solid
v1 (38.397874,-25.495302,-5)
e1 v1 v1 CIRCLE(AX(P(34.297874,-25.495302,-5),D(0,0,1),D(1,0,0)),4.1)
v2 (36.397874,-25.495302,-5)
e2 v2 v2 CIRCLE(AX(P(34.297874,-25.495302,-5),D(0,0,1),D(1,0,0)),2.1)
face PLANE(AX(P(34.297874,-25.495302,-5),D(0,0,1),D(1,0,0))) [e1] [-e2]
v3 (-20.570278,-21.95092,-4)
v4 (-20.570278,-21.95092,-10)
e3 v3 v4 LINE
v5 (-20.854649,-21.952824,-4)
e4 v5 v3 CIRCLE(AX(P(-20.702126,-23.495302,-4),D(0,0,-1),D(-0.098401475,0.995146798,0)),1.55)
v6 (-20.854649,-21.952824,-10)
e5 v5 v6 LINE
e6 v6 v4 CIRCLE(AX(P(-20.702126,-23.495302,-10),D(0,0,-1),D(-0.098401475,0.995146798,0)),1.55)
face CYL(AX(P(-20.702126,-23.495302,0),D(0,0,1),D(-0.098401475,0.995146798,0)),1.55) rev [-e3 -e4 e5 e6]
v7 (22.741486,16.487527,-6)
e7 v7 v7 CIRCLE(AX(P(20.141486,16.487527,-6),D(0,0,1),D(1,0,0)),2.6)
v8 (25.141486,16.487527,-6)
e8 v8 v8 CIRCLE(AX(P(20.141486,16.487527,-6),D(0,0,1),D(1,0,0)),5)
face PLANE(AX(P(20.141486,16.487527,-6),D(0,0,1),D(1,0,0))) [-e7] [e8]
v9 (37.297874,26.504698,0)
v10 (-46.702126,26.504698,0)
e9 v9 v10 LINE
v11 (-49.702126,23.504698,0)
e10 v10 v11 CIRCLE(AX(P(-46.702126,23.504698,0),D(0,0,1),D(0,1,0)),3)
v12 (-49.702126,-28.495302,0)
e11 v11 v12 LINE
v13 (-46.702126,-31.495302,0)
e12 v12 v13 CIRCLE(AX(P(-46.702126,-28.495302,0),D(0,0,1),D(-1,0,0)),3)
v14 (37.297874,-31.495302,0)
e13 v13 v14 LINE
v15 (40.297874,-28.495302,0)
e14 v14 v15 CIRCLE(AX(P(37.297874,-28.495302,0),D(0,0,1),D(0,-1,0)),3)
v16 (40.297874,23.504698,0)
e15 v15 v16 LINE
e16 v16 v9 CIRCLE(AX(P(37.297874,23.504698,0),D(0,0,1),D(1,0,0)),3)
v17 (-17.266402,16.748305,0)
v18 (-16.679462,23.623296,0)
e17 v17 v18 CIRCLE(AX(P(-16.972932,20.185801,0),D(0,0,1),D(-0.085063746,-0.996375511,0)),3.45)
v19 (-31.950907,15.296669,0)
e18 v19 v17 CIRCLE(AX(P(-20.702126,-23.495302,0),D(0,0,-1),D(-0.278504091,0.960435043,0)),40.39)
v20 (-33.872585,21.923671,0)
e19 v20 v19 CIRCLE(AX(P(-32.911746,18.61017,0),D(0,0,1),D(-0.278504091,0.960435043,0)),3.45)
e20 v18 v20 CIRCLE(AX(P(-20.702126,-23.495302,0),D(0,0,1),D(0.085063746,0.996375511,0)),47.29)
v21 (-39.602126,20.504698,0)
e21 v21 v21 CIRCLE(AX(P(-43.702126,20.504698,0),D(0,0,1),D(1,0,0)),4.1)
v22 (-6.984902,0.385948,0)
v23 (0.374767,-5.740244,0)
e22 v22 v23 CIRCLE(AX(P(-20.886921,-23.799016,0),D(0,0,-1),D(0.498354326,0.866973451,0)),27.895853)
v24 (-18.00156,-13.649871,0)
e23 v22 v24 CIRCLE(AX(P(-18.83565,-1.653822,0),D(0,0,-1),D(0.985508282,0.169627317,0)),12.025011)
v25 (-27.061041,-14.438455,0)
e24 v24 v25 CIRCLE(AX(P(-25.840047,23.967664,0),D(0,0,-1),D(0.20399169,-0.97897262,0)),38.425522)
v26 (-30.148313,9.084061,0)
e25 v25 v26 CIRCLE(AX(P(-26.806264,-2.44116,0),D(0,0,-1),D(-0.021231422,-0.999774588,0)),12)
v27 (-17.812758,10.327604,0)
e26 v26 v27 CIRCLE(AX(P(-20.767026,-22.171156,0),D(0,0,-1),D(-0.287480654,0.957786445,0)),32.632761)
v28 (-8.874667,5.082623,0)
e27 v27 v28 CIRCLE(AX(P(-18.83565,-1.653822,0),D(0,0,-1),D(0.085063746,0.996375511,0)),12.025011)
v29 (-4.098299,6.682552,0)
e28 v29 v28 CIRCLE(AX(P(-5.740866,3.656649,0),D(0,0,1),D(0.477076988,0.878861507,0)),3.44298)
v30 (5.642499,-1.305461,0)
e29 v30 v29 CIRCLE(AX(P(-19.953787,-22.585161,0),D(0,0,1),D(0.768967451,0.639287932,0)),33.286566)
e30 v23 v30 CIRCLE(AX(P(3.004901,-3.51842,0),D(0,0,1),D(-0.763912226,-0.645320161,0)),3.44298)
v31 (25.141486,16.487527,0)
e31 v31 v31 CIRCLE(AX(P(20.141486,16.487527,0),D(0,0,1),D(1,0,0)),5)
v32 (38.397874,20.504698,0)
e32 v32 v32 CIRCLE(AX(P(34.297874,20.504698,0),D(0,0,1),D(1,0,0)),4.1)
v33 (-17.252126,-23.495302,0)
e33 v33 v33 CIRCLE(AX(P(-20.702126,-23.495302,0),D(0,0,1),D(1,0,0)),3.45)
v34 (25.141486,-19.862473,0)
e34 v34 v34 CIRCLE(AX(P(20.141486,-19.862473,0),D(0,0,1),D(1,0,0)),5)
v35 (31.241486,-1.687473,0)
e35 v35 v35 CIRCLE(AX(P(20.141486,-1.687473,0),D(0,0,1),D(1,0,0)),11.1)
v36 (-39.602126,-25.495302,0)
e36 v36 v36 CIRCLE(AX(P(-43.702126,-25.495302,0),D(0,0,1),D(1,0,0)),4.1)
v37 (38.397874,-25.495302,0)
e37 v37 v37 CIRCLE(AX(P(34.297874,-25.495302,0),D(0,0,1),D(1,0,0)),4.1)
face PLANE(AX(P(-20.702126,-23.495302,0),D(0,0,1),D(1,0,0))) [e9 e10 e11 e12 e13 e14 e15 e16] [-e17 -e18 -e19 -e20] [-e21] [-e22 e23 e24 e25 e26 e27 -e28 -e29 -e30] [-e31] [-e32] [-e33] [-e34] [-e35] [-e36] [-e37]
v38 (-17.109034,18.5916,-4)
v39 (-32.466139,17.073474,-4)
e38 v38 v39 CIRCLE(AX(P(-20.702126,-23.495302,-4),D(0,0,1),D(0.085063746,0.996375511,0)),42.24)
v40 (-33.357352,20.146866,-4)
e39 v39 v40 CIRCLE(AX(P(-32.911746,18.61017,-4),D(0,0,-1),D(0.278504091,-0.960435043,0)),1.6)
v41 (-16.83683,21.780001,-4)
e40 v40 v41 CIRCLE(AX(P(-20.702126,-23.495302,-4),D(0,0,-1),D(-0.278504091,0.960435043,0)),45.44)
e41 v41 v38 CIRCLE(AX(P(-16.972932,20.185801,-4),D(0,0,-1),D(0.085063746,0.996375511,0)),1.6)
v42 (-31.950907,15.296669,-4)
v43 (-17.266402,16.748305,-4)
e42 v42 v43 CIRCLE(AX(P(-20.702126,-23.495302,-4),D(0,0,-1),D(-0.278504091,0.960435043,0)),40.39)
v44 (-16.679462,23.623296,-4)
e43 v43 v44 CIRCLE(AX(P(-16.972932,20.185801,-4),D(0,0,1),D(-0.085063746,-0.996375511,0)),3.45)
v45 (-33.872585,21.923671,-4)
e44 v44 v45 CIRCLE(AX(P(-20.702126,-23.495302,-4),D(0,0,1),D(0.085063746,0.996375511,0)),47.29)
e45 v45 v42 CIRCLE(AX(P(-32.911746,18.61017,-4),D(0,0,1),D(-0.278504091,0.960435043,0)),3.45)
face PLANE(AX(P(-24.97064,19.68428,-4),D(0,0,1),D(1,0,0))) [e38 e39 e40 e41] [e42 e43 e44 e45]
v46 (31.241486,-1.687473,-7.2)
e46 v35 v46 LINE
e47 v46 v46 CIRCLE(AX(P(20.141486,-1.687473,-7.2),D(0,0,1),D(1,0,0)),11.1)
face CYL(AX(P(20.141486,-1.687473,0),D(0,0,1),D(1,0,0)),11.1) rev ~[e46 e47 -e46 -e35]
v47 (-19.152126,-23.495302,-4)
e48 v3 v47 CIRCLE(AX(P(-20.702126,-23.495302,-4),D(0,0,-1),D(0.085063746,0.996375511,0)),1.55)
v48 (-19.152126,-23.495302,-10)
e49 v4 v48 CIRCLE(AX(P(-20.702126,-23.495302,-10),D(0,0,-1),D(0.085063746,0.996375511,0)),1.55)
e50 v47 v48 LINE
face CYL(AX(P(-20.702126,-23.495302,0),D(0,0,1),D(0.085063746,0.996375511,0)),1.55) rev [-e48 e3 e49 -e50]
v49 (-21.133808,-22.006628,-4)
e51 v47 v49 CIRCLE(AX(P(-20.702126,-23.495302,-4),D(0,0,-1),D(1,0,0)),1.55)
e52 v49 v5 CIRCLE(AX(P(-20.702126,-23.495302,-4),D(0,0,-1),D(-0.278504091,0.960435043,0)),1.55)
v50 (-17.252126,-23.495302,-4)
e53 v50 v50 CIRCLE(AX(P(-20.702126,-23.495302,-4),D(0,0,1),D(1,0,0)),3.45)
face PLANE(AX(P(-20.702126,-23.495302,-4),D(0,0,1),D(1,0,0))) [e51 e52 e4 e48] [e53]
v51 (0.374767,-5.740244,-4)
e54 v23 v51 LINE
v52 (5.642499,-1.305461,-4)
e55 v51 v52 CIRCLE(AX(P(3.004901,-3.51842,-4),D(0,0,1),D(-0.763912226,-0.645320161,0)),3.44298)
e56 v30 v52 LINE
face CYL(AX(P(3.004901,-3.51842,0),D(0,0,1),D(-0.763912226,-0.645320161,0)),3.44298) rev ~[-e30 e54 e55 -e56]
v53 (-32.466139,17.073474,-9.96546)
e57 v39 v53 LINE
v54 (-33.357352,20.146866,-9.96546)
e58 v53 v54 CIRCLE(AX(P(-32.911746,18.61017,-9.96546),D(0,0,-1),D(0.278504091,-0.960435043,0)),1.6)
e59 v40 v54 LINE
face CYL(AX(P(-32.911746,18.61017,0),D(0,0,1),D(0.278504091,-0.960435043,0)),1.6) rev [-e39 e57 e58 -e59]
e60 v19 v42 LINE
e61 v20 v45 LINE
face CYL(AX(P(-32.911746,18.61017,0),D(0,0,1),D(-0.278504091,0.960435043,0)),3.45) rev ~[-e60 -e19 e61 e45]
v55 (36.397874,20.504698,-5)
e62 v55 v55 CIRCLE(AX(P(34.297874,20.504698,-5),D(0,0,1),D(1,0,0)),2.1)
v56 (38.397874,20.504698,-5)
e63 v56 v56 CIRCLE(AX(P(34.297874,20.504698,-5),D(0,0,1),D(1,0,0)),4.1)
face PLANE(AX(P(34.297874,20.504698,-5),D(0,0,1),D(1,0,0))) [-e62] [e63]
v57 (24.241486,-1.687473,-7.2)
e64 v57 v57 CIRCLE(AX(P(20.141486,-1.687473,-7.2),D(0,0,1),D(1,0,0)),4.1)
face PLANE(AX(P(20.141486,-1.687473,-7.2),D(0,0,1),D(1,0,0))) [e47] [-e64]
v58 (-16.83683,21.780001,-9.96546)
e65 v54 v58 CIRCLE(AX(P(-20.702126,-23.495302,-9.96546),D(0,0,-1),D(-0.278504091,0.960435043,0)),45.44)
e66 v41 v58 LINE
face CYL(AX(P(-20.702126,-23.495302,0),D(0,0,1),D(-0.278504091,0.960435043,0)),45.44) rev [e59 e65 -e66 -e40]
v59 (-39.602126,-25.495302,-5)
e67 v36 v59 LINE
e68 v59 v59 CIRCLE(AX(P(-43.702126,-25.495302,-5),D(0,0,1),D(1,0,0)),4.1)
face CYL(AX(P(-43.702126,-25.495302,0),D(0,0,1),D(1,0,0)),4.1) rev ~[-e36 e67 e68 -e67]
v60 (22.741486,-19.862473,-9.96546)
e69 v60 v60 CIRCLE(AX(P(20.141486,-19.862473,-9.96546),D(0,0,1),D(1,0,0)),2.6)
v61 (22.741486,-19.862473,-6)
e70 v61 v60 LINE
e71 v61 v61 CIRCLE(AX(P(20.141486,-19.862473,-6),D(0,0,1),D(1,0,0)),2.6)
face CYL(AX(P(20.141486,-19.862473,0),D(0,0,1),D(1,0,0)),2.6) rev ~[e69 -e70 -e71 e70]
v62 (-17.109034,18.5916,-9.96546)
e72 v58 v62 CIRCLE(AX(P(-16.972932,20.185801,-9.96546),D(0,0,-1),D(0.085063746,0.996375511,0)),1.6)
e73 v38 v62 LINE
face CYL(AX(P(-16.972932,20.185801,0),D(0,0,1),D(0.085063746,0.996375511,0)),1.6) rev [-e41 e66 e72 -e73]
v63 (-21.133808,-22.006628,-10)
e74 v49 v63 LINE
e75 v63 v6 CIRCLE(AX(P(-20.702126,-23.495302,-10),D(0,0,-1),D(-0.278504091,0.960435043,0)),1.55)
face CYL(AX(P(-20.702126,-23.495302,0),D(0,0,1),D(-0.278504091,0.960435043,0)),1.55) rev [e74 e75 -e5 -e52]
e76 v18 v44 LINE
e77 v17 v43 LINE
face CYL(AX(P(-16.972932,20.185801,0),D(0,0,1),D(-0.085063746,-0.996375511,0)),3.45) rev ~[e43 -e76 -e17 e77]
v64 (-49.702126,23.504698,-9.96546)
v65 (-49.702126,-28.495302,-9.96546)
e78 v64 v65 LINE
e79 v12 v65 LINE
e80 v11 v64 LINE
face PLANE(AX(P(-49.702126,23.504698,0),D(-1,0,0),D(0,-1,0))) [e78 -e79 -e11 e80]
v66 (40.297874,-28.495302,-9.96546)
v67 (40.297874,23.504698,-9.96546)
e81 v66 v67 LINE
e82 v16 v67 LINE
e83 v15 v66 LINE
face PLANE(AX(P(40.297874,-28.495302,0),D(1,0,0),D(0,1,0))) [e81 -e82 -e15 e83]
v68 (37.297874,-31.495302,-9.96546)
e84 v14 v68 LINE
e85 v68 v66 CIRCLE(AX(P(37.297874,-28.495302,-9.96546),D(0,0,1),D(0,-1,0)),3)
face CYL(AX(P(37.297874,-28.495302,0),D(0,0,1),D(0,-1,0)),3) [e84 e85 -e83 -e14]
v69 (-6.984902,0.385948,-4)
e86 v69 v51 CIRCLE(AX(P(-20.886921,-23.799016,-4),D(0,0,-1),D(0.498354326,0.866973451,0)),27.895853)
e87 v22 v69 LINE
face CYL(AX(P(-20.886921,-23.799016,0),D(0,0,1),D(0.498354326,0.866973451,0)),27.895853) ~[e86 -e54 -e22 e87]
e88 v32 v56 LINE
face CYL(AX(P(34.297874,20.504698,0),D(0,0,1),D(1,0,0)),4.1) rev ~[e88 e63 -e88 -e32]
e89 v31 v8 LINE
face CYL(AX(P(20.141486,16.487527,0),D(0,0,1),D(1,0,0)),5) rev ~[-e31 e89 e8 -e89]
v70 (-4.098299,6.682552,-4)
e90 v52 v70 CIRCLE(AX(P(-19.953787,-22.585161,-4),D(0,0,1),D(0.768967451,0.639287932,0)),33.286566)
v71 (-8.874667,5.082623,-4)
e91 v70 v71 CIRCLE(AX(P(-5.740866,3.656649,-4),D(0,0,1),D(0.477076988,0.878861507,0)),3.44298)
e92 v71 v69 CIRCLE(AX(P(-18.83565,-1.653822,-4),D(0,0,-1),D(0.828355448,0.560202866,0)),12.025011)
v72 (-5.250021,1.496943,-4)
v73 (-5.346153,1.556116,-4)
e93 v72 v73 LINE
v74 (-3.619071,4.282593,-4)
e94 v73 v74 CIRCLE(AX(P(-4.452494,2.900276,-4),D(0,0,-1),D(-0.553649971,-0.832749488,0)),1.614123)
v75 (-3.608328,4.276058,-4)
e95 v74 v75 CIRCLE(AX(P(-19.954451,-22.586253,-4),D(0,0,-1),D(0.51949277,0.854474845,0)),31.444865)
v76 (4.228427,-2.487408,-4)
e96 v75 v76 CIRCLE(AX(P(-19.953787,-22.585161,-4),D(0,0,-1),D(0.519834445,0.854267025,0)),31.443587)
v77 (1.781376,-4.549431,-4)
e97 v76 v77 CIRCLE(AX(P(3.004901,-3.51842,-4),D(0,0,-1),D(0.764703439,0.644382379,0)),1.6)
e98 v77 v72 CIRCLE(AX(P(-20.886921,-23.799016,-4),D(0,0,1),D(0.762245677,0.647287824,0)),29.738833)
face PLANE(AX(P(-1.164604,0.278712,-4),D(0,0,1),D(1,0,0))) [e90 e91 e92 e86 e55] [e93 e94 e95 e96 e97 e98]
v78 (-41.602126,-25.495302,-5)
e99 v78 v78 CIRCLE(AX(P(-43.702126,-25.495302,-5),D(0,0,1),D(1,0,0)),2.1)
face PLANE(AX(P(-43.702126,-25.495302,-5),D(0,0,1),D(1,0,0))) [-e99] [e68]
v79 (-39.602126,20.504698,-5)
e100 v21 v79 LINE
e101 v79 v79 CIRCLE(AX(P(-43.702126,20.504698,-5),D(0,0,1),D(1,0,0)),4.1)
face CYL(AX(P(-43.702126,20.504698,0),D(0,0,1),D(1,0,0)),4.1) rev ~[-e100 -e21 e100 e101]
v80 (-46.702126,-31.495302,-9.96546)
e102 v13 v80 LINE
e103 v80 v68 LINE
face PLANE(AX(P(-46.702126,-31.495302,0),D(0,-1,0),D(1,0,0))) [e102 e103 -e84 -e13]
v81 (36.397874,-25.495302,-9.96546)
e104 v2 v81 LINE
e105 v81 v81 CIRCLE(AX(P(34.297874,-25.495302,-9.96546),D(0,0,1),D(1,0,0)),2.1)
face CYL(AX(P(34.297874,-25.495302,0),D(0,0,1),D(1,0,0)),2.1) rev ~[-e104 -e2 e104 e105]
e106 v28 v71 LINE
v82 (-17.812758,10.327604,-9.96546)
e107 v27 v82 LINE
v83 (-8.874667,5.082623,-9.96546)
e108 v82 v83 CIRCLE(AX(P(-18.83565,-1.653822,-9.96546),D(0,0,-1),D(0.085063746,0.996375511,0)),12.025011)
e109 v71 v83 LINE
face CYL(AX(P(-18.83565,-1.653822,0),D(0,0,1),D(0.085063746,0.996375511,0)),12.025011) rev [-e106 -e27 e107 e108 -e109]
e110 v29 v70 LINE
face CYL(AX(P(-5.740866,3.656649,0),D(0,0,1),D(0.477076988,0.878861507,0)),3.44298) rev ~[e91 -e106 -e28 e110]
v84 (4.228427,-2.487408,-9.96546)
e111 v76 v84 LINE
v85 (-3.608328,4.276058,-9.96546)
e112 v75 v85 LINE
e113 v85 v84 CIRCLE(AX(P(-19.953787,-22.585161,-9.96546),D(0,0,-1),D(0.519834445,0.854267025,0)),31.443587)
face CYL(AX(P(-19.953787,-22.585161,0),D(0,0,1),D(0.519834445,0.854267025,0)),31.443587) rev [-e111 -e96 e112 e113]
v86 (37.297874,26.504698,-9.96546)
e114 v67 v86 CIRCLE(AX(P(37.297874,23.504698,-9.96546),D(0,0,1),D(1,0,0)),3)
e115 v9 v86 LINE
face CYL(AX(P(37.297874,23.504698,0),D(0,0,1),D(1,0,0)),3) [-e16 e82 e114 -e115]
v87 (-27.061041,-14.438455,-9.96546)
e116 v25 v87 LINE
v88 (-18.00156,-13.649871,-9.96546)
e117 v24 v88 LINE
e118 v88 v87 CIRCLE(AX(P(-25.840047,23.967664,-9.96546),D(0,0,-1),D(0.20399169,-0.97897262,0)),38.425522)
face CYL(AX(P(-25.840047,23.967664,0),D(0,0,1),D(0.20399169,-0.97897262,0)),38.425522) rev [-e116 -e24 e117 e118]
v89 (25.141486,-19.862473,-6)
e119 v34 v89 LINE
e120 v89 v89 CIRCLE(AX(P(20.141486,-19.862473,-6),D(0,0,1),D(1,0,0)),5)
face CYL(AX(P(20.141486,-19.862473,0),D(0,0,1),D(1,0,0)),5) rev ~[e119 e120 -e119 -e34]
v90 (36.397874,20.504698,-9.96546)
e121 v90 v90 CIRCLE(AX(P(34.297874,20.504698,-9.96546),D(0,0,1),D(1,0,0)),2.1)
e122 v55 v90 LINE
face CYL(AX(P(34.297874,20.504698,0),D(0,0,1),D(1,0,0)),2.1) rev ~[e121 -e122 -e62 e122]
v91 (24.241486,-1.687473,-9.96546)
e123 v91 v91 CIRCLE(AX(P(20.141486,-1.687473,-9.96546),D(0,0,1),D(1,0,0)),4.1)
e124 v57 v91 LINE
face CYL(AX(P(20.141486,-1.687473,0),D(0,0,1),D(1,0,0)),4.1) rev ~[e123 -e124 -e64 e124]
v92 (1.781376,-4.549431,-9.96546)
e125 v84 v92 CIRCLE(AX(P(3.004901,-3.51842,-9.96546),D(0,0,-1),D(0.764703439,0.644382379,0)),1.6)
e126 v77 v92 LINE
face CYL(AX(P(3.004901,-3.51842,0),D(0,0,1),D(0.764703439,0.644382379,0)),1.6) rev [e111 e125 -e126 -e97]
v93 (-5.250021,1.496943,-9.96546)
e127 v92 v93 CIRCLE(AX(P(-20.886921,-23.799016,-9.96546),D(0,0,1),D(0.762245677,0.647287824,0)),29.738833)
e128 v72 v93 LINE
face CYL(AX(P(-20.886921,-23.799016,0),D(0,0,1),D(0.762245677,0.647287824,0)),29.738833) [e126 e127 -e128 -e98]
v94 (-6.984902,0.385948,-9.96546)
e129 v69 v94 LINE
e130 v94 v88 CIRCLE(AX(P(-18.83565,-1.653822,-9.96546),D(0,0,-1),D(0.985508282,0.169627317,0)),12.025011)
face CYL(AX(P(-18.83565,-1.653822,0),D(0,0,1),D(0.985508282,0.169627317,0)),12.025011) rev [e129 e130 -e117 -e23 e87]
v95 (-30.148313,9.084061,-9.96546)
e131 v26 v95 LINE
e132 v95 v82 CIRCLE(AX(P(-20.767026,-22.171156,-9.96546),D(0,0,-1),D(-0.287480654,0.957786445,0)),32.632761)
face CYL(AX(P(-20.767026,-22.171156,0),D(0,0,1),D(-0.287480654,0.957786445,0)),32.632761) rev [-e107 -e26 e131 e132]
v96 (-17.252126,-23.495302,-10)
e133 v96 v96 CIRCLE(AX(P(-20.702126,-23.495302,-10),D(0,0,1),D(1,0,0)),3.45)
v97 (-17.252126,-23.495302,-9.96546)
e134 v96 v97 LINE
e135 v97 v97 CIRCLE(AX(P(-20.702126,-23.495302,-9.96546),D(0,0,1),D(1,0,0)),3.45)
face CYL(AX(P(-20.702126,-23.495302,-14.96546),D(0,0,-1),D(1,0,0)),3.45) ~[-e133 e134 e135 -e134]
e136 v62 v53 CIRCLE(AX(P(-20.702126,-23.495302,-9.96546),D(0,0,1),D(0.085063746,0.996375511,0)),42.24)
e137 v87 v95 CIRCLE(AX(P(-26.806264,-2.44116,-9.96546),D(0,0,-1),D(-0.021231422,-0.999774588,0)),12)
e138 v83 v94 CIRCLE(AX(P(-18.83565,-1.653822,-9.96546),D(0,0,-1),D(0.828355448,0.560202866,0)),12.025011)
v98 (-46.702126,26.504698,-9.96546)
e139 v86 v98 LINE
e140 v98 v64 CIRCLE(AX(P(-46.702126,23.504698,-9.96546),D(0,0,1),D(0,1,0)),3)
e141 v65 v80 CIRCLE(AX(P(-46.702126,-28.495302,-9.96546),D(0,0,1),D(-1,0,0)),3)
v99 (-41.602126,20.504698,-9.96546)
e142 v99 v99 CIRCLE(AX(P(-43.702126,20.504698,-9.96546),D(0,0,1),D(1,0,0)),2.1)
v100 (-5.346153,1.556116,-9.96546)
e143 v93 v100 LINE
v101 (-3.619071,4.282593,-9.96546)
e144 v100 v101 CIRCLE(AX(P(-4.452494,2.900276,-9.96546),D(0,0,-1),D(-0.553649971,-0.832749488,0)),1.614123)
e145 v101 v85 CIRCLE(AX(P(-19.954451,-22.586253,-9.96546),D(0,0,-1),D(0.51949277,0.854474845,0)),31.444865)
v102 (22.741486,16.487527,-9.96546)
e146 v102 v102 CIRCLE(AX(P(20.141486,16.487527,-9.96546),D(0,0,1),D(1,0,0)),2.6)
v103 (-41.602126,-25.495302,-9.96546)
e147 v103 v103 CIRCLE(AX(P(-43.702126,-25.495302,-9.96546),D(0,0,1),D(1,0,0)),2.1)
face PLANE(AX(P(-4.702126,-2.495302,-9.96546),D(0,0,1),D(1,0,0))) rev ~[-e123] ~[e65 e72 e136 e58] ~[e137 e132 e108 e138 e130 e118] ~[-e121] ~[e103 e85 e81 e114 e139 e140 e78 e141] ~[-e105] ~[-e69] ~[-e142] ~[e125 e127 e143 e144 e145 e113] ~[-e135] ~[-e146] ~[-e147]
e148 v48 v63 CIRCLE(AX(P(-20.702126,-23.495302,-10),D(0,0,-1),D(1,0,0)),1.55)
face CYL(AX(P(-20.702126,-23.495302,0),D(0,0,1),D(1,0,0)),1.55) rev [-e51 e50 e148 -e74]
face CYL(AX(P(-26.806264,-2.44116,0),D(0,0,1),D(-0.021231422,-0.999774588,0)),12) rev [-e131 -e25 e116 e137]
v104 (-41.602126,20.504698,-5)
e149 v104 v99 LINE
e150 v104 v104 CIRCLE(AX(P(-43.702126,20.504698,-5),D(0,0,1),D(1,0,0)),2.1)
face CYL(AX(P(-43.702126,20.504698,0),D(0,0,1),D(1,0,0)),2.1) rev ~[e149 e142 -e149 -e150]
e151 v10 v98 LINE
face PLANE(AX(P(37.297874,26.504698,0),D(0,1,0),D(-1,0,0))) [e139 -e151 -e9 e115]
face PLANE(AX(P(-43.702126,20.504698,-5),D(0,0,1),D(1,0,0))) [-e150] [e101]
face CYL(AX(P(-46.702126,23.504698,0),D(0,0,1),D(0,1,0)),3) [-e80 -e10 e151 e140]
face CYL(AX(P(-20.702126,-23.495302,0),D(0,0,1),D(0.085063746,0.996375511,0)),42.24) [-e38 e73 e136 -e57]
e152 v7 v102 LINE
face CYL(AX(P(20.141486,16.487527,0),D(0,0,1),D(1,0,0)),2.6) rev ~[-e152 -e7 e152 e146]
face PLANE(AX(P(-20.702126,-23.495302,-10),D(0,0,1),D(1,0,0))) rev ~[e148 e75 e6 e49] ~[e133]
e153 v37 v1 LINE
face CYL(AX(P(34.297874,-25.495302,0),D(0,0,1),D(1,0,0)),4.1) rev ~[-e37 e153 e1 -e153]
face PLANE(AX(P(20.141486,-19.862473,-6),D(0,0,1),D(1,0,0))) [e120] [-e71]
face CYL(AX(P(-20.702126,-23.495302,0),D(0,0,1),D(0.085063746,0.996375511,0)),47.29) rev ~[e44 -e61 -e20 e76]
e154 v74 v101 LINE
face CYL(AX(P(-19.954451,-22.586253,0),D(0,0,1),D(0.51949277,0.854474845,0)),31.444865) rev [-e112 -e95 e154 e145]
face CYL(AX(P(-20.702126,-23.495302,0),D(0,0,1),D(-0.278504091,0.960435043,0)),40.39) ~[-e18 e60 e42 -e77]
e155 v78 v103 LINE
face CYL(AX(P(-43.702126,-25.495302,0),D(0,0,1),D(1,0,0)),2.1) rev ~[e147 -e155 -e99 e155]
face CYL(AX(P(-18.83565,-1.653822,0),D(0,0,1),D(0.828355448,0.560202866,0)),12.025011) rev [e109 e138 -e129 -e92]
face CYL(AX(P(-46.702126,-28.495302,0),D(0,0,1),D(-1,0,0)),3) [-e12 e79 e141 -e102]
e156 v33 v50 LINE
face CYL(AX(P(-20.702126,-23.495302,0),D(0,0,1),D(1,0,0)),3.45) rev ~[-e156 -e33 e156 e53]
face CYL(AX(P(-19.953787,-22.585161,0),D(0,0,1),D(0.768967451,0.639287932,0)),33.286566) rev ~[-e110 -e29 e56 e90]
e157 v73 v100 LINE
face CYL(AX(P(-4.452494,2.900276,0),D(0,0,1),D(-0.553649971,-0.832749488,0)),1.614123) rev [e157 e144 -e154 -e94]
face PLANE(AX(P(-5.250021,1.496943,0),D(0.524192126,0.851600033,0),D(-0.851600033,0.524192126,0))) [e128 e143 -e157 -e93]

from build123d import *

# Parameters (mm, degrees)
F0_R     = 4.1
F0_R_2   = 3.45
F0_R_3   = 5
F0_R_4   = 11.1
F0_R_5   = 2.1
F0_R_6   = 2.6
F1_DEPTH = 14.96546
F2_DEPTH = 7.2
F3_DEPTH = 10
F4_DEPTH = 6
F5_DEPTH = 5
F6_DEPTH = 4
F8_DEPTH = 5
F9_DEPTH = 4


# Not quite as in the source:
# - a feature of the source that left no trace in its solid (it failed there, or was rolled back) is left out


with BuildPart() as f1:
    # F0 (on Top) → F1 (new body)
    with BuildSketch(Plane.XY):
        with BuildLine():
            Line((40.2978736768, -28.4953018874), (40.2978736768, 23.5046981126))
            ThreePointArc((40.2978736768, 23.5046981126), (39.4191940204, 25.6260184562), (37.2978736768, 26.5046981126))
            Line((37.2978736768, 26.5046981126), (-46.7021263232, 26.5046981126))
            ThreePointArc((-46.7021263232, 26.5046981126), (-48.8234466667, 25.6260184562), (-49.7021263232, 23.5046981126))
            Line((-49.7021263232, 23.5046981126), (-49.7021263232, -28.4953018874))
            ThreePointArc((-49.7021263232, -28.4953018874), (-48.8234466667, -30.616622231), (-46.7021263232, -31.4953018874))
            Line((-46.7021263232, -31.4953018874), (37.2978736768, -31.4953018874))
            ThreePointArc((37.2978736768, -31.4953018874), (39.4191940204, -30.616622231), (40.2978736768, -28.4953018874))
        make_face()
        with Locations((-43.7021263232, -25.4953018874)):
            Circle(F0_R, mode=Mode.SUBTRACT)
        with Locations((-20.7021263232, -23.4953018874)):
            Circle(F0_R_2, mode=Mode.SUBTRACT)
        with Locations((34.2978736768, -25.4953018874)):
            Circle(F0_R, mode=Mode.SUBTRACT)
        with Locations((20.1414857655, -19.8624731614)):
            Circle(F0_R_3, mode=Mode.SUBTRACT)
        with BuildLine():
            ThreePointArc((-27.0610410054, -14.4384550356), (-38.7042248704, -4.0027379443), (-30.1483130342, 9.0840605325))
            ThreePointArc((-30.1483130342, 9.0840605325), (-24.0401350261, 10.2970418321), (-17.812757717, 10.3276042456))
            ThreePointArc((-17.812757717, 10.3276042456), (-12.7496960333, 8.7173903949), (-8.8746668433, 5.0826234101))
            ThreePointArc((-8.8746668433, 5.0826234101), (-6.8344324137, 6.9213428638), (-4.0982992493, 6.6825520261))
            ThreePointArc((-4.0982992493, 6.6825520261), (1.1534268102, 3.1535460469), (5.6424990908, -1.3054605538))
            ThreePointArc((5.6424990908, -1.3054605538), (5.2222958167, -6.1522895109), (0.3747665359, -5.7402438785))
            ThreePointArc((0.3747665359, -5.7402438785), (-3.0402373822, -2.3589951286), (-6.9849022966, 0.3859481464))
            ThreePointArc((-6.9849022966, 0.3859481464), (-9.3764041754, -9.0783459927), (-18.0015595875, -13.6498707823))
            ThreePointArc((-18.0015595875, -13.6498707823), (-22.5078898853, -14.3131084069), (-27.0610410054, -14.4384550356))
        make_face(mode=Mode.SUBTRACT)
        with Locations((-43.7021263232, 20.5046981126)):
            Circle(F0_R, mode=Mode.SUBTRACT)
        with BuildLine():
            ThreePointArc((-33.8725847885, 21.9236712826), (-25.3542994236, 23.5653120636), (-16.6794617957, 23.6232960342))
            ThreePointArc((-16.6794617957, 23.6232960342), (-13.5354362045, 19.8923305986), (-17.2664016401, 16.7483050074))
            ThreePointArc((-17.2664016401, 16.7483050074), (-24.6755091002, 16.698781375), (-31.9509065603, 15.2966694878))
            ThreePointArc((-31.9509065603, 15.2966694878), (-36.2252465717, 17.6493312711), (-33.8725847885, 21.9236712826))
        make_face(mode=Mode.SUBTRACT)
        with Locations((20.1414857655, -1.6874731614)):
            Circle(F0_R_4, mode=Mode.SUBTRACT)
        with Locations((20.1414857655, 16.4875268386)):
            Circle(F0_R_3, mode=Mode.SUBTRACT)
        with Locations((34.2978736768, 20.5046981126)):
            Circle(F0_R, mode=Mode.SUBTRACT)
        with Locations((-43.7021263232, -25.4953018874)):
            Circle(F0_R)
        with Locations((-43.7021263232, -25.4953018874)):
            Circle(F0_R_5, mode=Mode.SUBTRACT)
        with Locations((20.1414857655, -19.8624731614)):
            Circle(F0_R_3)
        with Locations((20.1414857655, -19.8624731614)):
            Circle(F0_R_6, mode=Mode.SUBTRACT)
        with Locations((34.2978736768, -25.4953018874)):
            Circle(F0_R)
        with Locations((34.2978736768, -25.4953018874)):
            Circle(F0_R_5, mode=Mode.SUBTRACT)
        with Locations((34.2978736768, 20.5046981126)):
            Circle(F0_R)
        with Locations((34.2978736768, 20.5046981126)):
            Circle(F0_R_5, mode=Mode.SUBTRACT)
        with Locations((-43.7021263232, 20.5046981126)):
            Circle(F0_R)
        with Locations((-43.7021263232, 20.5046981126)):
            Circle(F0_R_5, mode=Mode.SUBTRACT)
        with BuildLine():
            ThreePointArc((-4.0982992493, 6.6825520261), (-6.8344324137, 6.9213428638), (-8.8746668433, 5.0826234101))
            ThreePointArc((-8.8746668433, 5.0826234101), (-7.6798178788, 2.8348629236), (-6.9849022966, 0.3859481464))
            ThreePointArc((-6.9849022966, 0.3859481464), (-3.0402373822, -2.3589951286), (0.3747665359, -5.7402438785))
            ThreePointArc((0.3747665359, -5.7402438785), (5.2222958167, -6.1522895109), (5.6424990908, -1.3054605538))
            ThreePointArc((5.6424990908, -1.3054605538), (1.1534268102, 3.1535460469), (-4.0982992493, 6.6825520261))
        make_face()
        with BuildLine():
            ThreePointArc((4.228426517, -2.4874076976), (4.0359128199, -4.7419450063), (1.7813755112, -4.5494313092))
            ThreePointArc((1.7813755112, -4.5494313092), (-1.4971898234, -1.2504793297), (-5.2500213098, 1.4969432172))
            Line((-5.2500213098, 1.4969432172), (-5.3461533688, 1.5561161463))
            ThreePointArc((-5.3461533688, 1.5561161463), (-5.8160652882, 3.7640280348), (-3.6190713255, 4.2825930236))
            ThreePointArc((-3.6190713255, 4.2825930236), (-3.6136992043, 4.2793262139), (-3.6083277364, 4.2760583301))
            ThreePointArc((-3.6083277364, 4.2760583301), (0.5902920346, 1.2190394089), (4.228426517, -2.4874076976))
        make_face(mode=Mode.SUBTRACT)
        with Locations((20.1414857655, -1.6874731614)):
            Circle(F0_R_4)
        with Locations((20.1414857655, -1.6874731614)):
            Circle(F0_R, mode=Mode.SUBTRACT)
        with Locations((20.1414857655, 16.4875268386)):
            Circle(F0_R_3)
        with Locations((20.1414857655, 16.4875268386)):
            Circle(F0_R_6, mode=Mode.SUBTRACT)
        with BuildLine():
            ThreePointArc((-17.2664016401, 16.7483050074), (-13.5354362045, 19.8923305986), (-16.6794617957, 23.6232960342))
            ThreePointArc((-16.6794617957, 23.6232960342), (-25.3542994236, 23.5653120636), (-33.8725847885, 21.9236712826))
            ThreePointArc((-33.8725847885, 21.9236712826), (-36.2252465717, 17.6493312711), (-31.9509065603, 15.2966694878))
            ThreePointArc((-31.9509065603, 15.2966694878), (-24.6755091002, 16.698781375), (-17.2664016401, 16.7483050074))
        make_face()
        with BuildLine():
            ThreePointArc((-32.4661391287, 17.0734743169), (-34.4484417427, 18.1645638395), (-33.35735222, 20.1468664535))
            ThreePointArc((-33.35735222, 20.1468664535), (-25.1723049166, 21.7242857196), (-16.836829725, 21.7800013386))
            ThreePointArc((-16.836829725, 21.7800013386), (-15.3787309001, 20.0496985279), (-17.1090337108, 18.591599703))
            ThreePointArc((-17.1090337108, 18.591599703), (-24.8575036072, 18.5398077191), (-32.4661391287, 17.0734743169))
        make_face(mode=Mode.SUBTRACT)
    extrude(amount=-F1_DEPTH)

    # F0 (on Top) → F2 (cut)
    with BuildSketch(Plane.XY):
        with Locations((20.1414857655, -1.6874731614)):
            Circle(F0_R_4)
        with Locations((20.1414857655, -1.6874731614)):
            Circle(F0_R, mode=Mode.SUBTRACT)
    extrude(amount=-F2_DEPTH, mode=Mode.SUBTRACT)

    # F0 (on Top) → F3 (join)
    with BuildSketch(Plane.XY):
        with Locations((-20.7021263232, -23.4953018874)):
            Circle(F0_R_2)
        with BuildLine():
            ThreePointArc((-20.5702775175, -21.9509198451), (-19.5604464975, -22.4469378401), (-19.1521263232, -23.4953018874))
            ThreePointArc((-19.1521263232, -23.4953018874), (-21.6330919297, -24.7345770947), (-21.1338076643, -22.0066275712))
            ThreePointArc((-21.1338076643, -22.0066275712), (-20.9954642962, -21.9733121261), (-20.8546486103, -21.9528243505))
            ThreePointArc((-20.8546486103, -21.9528243505), (-20.7125068335, -21.9453366475), (-20.5702775175, -21.9509198451))
        make_face(mode=Mode.SUBTRACT)
    extrude(amount=-F3_DEPTH)

    # F0 (on Top) → F4 (cut)
    with BuildSketch(Plane.XY):
        with Locations((20.1414857655, 16.4875268386)):
            Circle(F0_R_3)
        with Locations((20.1414857655, 16.4875268386)):
            Circle(F0_R_6, mode=Mode.SUBTRACT)
        with Locations((20.1414857655, -19.8624731614)):
            Circle(F0_R_3)
        with Locations((20.1414857655, -19.8624731614)):
            Circle(F0_R_6, mode=Mode.SUBTRACT)
    extrude(amount=-F4_DEPTH, mode=Mode.SUBTRACT)

    # F0 (on Top) → F5 (cut)
    with BuildSketch(Plane.XY):
        with Locations((-43.7021263232, 20.5046981126)):
            Circle(F0_R)
        with Locations((-43.7021263232, 20.5046981126)):
            Circle(F0_R_5, mode=Mode.SUBTRACT)
        with Locations((-43.7021263232, -25.4953018874)):
            Circle(F0_R)
        with Locations((-43.7021263232, -25.4953018874)):
            Circle(F0_R_5, mode=Mode.SUBTRACT)
        with Locations((34.2978736768, 20.5046981126)):
            Circle(F0_R)
        with Locations((34.2978736768, 20.5046981126)):
            Circle(F0_R_5, mode=Mode.SUBTRACT)
        with Locations((34.2978736768, -25.4953018874)):
            Circle(F0_R)
        with Locations((34.2978736768, -25.4953018874)):
            Circle(F0_R_5, mode=Mode.SUBTRACT)
    extrude(amount=-F5_DEPTH, mode=Mode.SUBTRACT)

    # F0 (on Top) → F6 (cut)
    with BuildSketch(Plane.XY):
        with BuildLine():
            ThreePointArc((-17.2664016401, 16.7483050074), (-13.5354362045, 19.8923305986), (-16.6794617957, 23.6232960342))
            ThreePointArc((-16.6794617957, 23.6232960342), (-25.3542994236, 23.5653120636), (-33.8725847885, 21.9236712826))
            ThreePointArc((-33.8725847885, 21.9236712826), (-36.2252465717, 17.6493312711), (-31.9509065603, 15.2966694878))
            ThreePointArc((-31.9509065603, 15.2966694878), (-24.6755091002, 16.698781375), (-17.2664016401, 16.7483050074))
        make_face()
        with BuildLine():
            ThreePointArc((-32.4661391287, 17.0734743169), (-34.4484417427, 18.1645638395), (-33.35735222, 20.1468664535))
            ThreePointArc((-33.35735222, 20.1468664535), (-25.1723049166, 21.7242857196), (-16.836829725, 21.7800013386))
            ThreePointArc((-16.836829725, 21.7800013386), (-15.3787309001, 20.0496985279), (-17.1090337108, 18.591599703))
            ThreePointArc((-17.1090337108, 18.591599703), (-24.8575036072, 18.5398077191), (-32.4661391287, 17.0734743169))
        make_face(mode=Mode.SUBTRACT)
        with BuildLine():
            ThreePointArc((-4.0982992493, 6.6825520261), (-6.8344324137, 6.9213428638), (-8.8746668433, 5.0826234101))
            ThreePointArc((-8.8746668433, 5.0826234101), (-7.6798178788, 2.8348629236), (-6.9849022966, 0.3859481464))
            ThreePointArc((-6.9849022966, 0.3859481464), (-3.0402373822, -2.3589951286), (0.3747665359, -5.7402438785))
            ThreePointArc((0.3747665359, -5.7402438785), (5.2222958167, -6.1522895109), (5.6424990908, -1.3054605538))
            ThreePointArc((5.6424990908, -1.3054605538), (1.1534268102, 3.1535460469), (-4.0982992493, 6.6825520261))
        make_face()
        with BuildLine():
            ThreePointArc((4.228426517, -2.4874076976), (4.0359128199, -4.7419450063), (1.7813755112, -4.5494313092))
            ThreePointArc((1.7813755112, -4.5494313092), (-1.4971898234, -1.2504793297), (-5.2500213098, 1.4969432172))
            Line((-5.2500213098, 1.4969432172), (-5.3461533688, 1.5561161463))
            ThreePointArc((-5.3461533688, 1.5561161463), (-5.8160652882, 3.7640280348), (-3.6190713255, 4.2825930236))
            ThreePointArc((-3.6190713255, 4.2825930236), (-3.6136992043, 4.2793262139), (-3.6083277364, 4.2760583301))
            ThreePointArc((-3.6083277364, 4.2760583301), (0.5902920346, 1.2190394089), (4.228426517, -2.4874076976))
        make_face(mode=Mode.SUBTRACT)
        with Locations((-20.7021263232, -23.4953018874)):
            Circle(F0_R_2)
        with BuildLine():
            ThreePointArc((-20.5702775175, -21.9509198451), (-19.5604464975, -22.4469378401), (-19.1521263232, -23.4953018874))
            ThreePointArc((-19.1521263232, -23.4953018874), (-21.6330919297, -24.7345770947), (-21.1338076643, -22.0066275712))
            ThreePointArc((-21.1338076643, -22.0066275712), (-20.9954642962, -21.9733121261), (-20.8546486103, -21.9528243505))
            ThreePointArc((-20.8546486103, -21.9528243505), (-20.7125068335, -21.9453366475), (-20.5702775175, -21.9509198451))
        make_face(mode=Mode.SUBTRACT)
    extrude(amount=-F6_DEPTH, mode=Mode.SUBTRACT)

    # F8 (cut): a face of the model
    f8_faces = [f1.faces().sort_by_distance(p)[0] for p in [
        (-2.1196773193, -2.7350856403, -14.96546),
    ]]
    extrude(f8_faces, amount=-F8_DEPTH, mode=Mode.SUBTRACT)

    # F0 (on Top) → F9 (cut)
    with BuildSketch(Plane.XY):
        with Locations((-20.7021263232, -23.4953018874)):
            Circle(F0_R_2)
        with BuildLine():
            ThreePointArc((-20.5702775175, -21.9509198451), (-19.5604464975, -22.4469378401), (-19.1521263232, -23.4953018874))
            ThreePointArc((-19.1521263232, -23.4953018874), (-21.6330919297, -24.7345770947), (-21.1338076643, -22.0066275712))
            ThreePointArc((-21.1338076643, -22.0066275712), (-20.9954642962, -21.9733121261), (-20.8546486103, -21.9528243505))
            ThreePointArc((-20.8546486103, -21.9528243505), (-20.7125068335, -21.9453366475), (-20.5702775175, -21.9509198451))
        make_face(mode=Mode.SUBTRACT)
    extrude(amount=-F9_DEPTH, mode=Mode.SUBTRACT)


solid = f1.part
